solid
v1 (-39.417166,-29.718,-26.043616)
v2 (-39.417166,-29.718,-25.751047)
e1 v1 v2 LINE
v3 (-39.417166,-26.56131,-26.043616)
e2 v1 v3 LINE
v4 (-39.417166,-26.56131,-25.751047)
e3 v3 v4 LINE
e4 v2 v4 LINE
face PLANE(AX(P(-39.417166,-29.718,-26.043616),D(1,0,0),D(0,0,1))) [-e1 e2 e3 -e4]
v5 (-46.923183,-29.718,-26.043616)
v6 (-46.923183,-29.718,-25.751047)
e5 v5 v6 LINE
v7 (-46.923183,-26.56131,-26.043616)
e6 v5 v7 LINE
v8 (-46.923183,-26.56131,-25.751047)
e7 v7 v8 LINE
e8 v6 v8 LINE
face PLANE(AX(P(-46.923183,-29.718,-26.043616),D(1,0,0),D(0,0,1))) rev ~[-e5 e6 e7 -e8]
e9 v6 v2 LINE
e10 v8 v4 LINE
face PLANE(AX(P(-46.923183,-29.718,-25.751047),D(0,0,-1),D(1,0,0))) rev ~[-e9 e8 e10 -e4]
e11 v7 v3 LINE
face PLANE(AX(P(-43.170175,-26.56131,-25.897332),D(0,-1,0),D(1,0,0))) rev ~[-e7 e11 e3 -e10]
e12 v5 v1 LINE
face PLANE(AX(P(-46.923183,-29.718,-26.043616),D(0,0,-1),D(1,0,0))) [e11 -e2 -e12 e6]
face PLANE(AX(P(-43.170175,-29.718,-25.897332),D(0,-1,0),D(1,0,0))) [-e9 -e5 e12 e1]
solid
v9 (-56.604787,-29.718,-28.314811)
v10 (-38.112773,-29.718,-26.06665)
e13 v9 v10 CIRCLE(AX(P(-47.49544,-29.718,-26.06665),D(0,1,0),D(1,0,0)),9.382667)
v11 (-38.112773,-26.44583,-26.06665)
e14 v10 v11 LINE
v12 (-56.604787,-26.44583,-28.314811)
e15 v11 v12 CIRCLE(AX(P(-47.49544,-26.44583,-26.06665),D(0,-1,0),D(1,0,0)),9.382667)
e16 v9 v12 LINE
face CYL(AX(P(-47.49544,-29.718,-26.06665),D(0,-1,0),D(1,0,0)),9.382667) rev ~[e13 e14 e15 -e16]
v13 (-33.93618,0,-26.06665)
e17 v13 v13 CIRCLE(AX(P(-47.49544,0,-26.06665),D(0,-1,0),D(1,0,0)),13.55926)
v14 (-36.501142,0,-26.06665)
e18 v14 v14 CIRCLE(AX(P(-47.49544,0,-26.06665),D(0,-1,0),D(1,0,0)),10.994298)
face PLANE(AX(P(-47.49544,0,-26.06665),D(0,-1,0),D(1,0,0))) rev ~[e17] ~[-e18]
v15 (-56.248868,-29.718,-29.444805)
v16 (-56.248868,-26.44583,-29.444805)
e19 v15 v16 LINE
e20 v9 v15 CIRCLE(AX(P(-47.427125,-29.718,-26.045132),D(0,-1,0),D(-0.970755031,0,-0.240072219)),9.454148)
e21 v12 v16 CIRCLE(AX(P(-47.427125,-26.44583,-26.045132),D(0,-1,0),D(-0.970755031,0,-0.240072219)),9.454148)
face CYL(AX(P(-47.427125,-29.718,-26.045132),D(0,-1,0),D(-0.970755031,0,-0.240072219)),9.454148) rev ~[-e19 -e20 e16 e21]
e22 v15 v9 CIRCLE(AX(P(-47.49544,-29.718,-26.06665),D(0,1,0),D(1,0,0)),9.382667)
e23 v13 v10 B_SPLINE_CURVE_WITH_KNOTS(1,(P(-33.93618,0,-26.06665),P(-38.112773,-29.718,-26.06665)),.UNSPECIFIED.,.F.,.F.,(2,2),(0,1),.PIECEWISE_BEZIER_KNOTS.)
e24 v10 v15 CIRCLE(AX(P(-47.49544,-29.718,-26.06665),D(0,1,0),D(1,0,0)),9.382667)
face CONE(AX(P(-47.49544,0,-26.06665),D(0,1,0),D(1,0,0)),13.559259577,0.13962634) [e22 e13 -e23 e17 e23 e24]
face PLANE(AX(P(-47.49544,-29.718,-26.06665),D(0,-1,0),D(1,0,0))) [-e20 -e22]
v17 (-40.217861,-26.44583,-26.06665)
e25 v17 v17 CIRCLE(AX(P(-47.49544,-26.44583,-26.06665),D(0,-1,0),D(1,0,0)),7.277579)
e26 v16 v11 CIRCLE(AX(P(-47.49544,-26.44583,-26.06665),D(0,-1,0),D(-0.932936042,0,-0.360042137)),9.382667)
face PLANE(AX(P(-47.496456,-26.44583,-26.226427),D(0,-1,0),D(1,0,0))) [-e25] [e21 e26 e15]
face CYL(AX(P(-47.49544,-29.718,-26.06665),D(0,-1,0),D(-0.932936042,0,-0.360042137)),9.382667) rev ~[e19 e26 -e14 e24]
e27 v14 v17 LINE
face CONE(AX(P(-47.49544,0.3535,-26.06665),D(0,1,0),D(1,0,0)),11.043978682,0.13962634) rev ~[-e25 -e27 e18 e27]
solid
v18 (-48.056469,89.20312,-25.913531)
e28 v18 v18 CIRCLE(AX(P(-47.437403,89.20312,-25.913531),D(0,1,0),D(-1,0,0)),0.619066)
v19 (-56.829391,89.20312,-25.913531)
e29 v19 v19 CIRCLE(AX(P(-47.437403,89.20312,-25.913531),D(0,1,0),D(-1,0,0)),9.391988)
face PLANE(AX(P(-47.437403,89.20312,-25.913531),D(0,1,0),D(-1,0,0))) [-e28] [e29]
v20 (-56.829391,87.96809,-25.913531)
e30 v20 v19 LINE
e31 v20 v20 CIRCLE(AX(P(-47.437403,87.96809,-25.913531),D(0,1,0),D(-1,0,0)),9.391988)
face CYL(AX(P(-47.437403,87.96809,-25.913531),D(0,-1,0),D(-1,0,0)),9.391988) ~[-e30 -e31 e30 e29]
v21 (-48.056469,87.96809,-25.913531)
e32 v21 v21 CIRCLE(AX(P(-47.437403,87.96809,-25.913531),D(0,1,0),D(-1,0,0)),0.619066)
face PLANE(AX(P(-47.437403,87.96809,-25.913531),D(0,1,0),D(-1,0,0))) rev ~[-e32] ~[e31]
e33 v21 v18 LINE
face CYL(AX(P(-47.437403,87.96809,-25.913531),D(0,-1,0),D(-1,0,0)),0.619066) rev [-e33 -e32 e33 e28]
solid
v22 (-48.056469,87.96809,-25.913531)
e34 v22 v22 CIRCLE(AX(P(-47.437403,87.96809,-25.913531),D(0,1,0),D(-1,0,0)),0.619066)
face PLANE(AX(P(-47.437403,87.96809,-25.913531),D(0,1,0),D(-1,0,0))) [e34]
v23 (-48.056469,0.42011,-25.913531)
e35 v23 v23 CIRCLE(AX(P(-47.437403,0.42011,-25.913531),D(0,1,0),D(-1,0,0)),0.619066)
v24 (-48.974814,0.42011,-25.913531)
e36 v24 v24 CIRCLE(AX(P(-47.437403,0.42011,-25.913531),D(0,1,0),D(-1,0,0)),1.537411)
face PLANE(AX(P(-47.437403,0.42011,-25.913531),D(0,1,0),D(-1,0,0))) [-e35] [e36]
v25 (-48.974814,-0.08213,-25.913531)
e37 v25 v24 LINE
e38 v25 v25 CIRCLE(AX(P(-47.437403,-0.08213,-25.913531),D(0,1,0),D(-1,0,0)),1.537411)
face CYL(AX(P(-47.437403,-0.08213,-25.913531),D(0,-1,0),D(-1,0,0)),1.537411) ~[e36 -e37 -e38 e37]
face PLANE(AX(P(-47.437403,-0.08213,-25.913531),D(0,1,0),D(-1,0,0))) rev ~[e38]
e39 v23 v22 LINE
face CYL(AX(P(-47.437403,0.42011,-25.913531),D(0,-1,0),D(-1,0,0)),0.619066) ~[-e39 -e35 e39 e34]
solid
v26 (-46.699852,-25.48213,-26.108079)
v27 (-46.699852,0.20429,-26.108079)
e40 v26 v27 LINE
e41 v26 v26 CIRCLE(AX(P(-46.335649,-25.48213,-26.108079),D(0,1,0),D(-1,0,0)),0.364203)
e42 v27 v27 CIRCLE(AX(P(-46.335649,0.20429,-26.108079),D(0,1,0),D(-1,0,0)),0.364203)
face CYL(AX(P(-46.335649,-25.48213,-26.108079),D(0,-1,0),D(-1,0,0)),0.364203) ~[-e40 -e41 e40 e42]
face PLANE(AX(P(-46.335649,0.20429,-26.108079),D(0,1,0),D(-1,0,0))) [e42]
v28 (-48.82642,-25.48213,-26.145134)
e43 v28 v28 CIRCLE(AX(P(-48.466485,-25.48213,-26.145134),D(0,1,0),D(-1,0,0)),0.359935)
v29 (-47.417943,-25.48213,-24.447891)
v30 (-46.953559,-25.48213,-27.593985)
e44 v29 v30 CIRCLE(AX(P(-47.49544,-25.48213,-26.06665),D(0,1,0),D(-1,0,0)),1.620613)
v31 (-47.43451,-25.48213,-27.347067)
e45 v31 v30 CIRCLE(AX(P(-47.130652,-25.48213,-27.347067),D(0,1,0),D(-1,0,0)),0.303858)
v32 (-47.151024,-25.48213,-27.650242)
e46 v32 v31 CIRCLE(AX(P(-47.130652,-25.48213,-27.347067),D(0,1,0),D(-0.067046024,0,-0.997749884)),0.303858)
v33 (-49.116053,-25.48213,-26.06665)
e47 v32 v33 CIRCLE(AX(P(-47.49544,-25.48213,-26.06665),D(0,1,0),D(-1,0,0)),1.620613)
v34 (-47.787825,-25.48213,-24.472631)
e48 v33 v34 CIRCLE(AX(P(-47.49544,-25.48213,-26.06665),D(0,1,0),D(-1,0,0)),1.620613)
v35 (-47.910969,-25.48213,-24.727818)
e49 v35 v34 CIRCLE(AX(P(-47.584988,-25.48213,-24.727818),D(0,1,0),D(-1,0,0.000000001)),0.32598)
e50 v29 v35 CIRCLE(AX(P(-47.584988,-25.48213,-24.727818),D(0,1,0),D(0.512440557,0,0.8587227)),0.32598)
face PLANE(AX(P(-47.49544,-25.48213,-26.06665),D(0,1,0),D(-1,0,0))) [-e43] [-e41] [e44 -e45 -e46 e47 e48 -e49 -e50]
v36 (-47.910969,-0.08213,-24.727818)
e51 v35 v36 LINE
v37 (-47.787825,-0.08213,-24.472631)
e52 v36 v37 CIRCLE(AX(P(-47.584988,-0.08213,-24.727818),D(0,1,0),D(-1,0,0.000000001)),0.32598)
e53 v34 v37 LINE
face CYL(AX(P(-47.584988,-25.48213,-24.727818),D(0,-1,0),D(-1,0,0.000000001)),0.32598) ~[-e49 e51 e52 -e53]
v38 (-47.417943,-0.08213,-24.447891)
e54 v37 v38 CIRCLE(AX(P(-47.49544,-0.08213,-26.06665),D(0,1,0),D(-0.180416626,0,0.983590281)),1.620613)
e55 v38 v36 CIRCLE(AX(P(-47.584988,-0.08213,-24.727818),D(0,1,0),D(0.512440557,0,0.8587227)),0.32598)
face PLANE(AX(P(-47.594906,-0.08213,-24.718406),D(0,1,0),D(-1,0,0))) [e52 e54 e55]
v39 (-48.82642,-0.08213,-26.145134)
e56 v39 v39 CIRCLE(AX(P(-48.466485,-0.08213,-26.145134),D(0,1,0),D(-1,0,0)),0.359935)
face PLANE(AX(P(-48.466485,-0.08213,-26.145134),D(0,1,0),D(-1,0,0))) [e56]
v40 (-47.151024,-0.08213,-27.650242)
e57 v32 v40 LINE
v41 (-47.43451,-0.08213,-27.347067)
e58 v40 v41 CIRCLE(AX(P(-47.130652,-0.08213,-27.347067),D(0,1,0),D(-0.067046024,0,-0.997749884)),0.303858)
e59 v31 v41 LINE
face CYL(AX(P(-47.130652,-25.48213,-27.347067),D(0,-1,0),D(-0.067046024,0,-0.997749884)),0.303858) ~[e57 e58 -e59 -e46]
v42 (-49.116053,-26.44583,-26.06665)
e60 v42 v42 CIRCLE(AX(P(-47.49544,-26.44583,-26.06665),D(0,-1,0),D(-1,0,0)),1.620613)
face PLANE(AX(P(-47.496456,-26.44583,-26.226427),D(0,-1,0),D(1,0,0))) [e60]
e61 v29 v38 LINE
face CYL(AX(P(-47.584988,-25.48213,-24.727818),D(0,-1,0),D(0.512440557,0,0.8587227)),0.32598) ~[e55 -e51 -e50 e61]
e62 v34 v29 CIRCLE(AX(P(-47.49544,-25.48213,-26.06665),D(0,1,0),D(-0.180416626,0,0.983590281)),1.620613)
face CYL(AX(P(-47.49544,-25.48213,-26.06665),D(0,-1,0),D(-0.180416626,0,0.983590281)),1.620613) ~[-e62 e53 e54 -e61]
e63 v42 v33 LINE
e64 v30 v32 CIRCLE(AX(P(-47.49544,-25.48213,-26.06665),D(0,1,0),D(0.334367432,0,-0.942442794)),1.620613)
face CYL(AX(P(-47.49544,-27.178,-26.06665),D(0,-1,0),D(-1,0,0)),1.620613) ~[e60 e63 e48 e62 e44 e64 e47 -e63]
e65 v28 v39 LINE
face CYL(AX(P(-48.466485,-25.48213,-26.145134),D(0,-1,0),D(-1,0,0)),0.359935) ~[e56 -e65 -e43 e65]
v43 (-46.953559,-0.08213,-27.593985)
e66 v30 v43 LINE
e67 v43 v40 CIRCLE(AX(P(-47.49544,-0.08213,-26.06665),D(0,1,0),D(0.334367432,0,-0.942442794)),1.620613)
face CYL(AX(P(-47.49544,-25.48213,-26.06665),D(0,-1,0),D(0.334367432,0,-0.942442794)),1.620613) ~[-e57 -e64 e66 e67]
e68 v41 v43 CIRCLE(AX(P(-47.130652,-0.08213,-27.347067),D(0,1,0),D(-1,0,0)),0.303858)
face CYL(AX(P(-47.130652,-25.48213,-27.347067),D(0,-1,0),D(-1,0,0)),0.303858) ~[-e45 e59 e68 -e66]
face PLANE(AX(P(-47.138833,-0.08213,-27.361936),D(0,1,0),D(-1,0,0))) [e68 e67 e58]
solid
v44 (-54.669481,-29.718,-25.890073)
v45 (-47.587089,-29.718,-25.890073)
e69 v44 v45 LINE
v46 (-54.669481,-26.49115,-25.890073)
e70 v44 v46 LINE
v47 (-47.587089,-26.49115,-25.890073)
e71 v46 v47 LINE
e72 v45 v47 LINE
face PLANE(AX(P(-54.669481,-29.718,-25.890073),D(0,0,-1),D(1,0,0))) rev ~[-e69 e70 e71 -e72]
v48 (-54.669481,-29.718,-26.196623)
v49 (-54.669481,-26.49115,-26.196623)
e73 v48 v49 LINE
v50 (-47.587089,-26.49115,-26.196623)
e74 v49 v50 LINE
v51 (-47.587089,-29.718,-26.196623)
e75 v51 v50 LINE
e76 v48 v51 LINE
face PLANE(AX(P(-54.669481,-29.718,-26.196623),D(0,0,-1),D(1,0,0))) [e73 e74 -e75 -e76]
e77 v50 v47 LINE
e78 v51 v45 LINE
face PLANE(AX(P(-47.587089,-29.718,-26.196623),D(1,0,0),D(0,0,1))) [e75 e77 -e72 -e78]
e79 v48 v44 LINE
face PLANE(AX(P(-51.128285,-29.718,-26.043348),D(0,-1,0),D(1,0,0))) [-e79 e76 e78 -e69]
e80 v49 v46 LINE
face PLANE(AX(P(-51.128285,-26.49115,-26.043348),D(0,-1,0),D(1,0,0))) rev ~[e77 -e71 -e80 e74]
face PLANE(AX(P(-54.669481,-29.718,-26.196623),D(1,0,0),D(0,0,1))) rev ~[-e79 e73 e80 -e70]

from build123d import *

# Parameters (mm, degrees)
F0_R      = 13.5592595767
F1_DEPTH  = 29.718
F1_TAPER  = 8
F2_T      = -2.54
F3_R      = 1.6206128815
F4_DEPTH  = 1.69587
F5_R      = 0.3642033025
F6_DEPTH  = 25.68642
F7_R      = 0.3599346609
F8_DEPTH  = 25.4
F10_DEPTH = 25.4
F12_DEPTH = 25.4
F14_R     = 1.5374110376
F15_DEPTH = 0.50224
F16_R     = 0.6190660423
F17_DEPTH = 87.54798
F18_R     = 9.3919876404
F18_R_2   = 0.6190660423
F19_DEPTH = 1.23503
F23_DEPTH = 3.27217
F24_W     = 7.0823915303
F24_H     = 0.3065504134
F25_DEPTH = 3.22685
F26_W     = 7.5060166419
F26_H     = 0.2925693989
F27_DEPTH = 3.15669


with BuildPart() as f1:
    # F0 (on Front) → F1 (new body)
    with BuildSketch(Plane.XZ):
        with Locations((-47.4954396486, -26.0666497052)):
            Circle(F0_R)
    extrude(amount=F1_DEPTH, taper=F1_TAPER)

    # F2
    f2_openings = [f1.faces().sort_by_distance(p)[0] for p in [
        (-47.49544, 0, -26.06665),
    ]]
    offset(amount=F2_T, openings=f2_openings, kind=Kind.INTERSECTION)


with BuildPart() as f4:
    # F3 (on face) → F4 (new body)
    with BuildSketch(Plane(origin=(0, -27.178, 0), x_dir=(-1, 0, 0), z_dir=(0, 1, 0))):
        with Locations((47.4954396486, -26.0666497052)):
            Circle(F3_R)
    extrude(amount=F4_DEPTH)

    # F5 (on face) → F6 (join)
    with BuildSketch(Plane(origin=(0, -25.48213, 0), x_dir=(-1, 0, 0), z_dir=(0, 1, 0))):
        with Locations((46.3356487453, -26.1080786586)):
            Circle(F5_R)
    extrude(amount=F6_DEPTH)

    # F7 (on face) → F8 (join)
    with BuildSketch(Plane(origin=(0, -25.48213, 0), x_dir=(-1, 0, 0), z_dir=(0, 1, 0))):
        with Locations((48.4664849937, -26.1451341212)):
            Circle(F7_R)
    extrude(amount=F8_DEPTH)

    # F9 (on face) → F10 (join)
    with BuildSketch(Plane(origin=(0, -25.48213, 0), x_dir=(-1, 0, 0), z_dir=(0, 1, 0))):
        with BuildLine():
            ThreePointArc((47.41794258, -24.4478908238), (47.4240384196, -25.011293234), (47.9109686139, -24.7278176248))
            ThreePointArc((47.9109686139, -24.7278176248), (47.8785730308, -24.5861448369), (47.7878251577, -24.4726306257))
            ThreePointArc((47.7878251577, -24.4726306257), (47.6035935894, -24.4496497557), (47.41794258, -24.4478908238))
        make_face()
    extrude(amount=F10_DEPTH)

    # F11 (on face) → F12 (join)
    with BuildSketch(Plane(origin=(0, -25.48213, 0), x_dir=(-1, 0, 0), z_dir=(0, 1, 0))):
        with BuildLine():
            ThreePointArc((47.1510242573, -27.6502418717), (47.3525978951, -27.5545998612), (47.434509989, -27.347067371))
            ThreePointArc((47.434509989, -27.347067371), (46.9918734087, -27.0767520331), (46.9535594811, -27.5939846375))
            ThreePointArc((46.9535594811, -27.5939846375), (47.0514000406, -27.6252436029), (47.1510242573, -27.6502418717))
        make_face()
    extrude(amount=F12_DEPTH)


with BuildPart() as f15:
    # F14 (on face) → F15 (new body)
    with BuildSketch(Plane(origin=(0, -0.08213, 0), x_dir=(-1, 0, 0), z_dir=(0, 1, 0))):
        with Locations((47.4374033511, -25.9135309607)):
            Circle(F14_R)
    extrude(amount=F15_DEPTH)

    # F16 (on face) → F17 (join)
    with BuildSketch(Plane(origin=(0, 0.42011, 0), x_dir=(-1, 0, 0), z_dir=(0, 1, 0))):
        with Locations((47.4374033511, -25.9135309607)):
            Circle(F16_R)
    extrude(amount=F17_DEPTH)


with BuildPart() as f19:
    # F18 (on face) → F19 (new body)
    with BuildSketch(Plane(origin=(0, 87.96809, 0), x_dir=(-1, 0, 0), z_dir=(0, 1, 0))):
        with Locations((47.4374033511, -25.9135309607)):
            Circle(F18_R)
        with Locations((47.4374033511, -25.9135309607)):
            Circle(F18_R_2, mode=Mode.SUBTRACT)
    extrude(amount=F19_DEPTH)


with BuildPart() as f23_tool:
    # F22 (on face) → F23 (new body)
    with BuildSketch(Plane.XZ.offset(29.718)):
        with BuildLine():
            ThreePointArc((-38.1127725976, -26.0666497052), (-48.6277968924, -16.7525631658), (-56.6047872009, -28.3148107674))
            ThreePointArc((-56.6047872009, -28.3148107674), (-56.4445452516, -28.885388606), (-56.2488679145, -29.4448052056))
            ThreePointArc((-56.2488679145, -29.4448052056), (-45.77731014, -35.2906657493), (-38.1127725976, -26.0666497052))
        make_face()
    extrude(amount=-F23_DEPTH)


with BuildPart() as f1_1:
    add(f1.part)

    # F23: cut by f23_tool
    add(f23_tool.part, mode=Mode.SUBTRACT)


with BuildPart() as f4_1:
    add(f4.part)

    # F23: cut by f23_tool
    add(f23_tool.part, mode=Mode.SUBTRACT)


with BuildPart() as f25:
    # F24 (on face) → F25 (new body)
    with BuildSketch(Plane.XZ.offset(29.718)):
        with Locations((-51.1282850057, -26.0433480144)):
            Rectangle(F24_W, F24_H)
    extrude(amount=-F25_DEPTH)


with BuildPart() as f27:
    # F26 (on face) → F27 (new body)
    with BuildSketch(Plane.XZ.offset(29.718)):
        with Locations((-43.1701745838, -25.8973315358)):
            Rectangle(F26_W, F26_H)
    extrude(amount=-F27_DEPTH)


solid = Compound([f15.part, f19.part, f1_1.part, f4_1.part, f25.part, f27.part])
